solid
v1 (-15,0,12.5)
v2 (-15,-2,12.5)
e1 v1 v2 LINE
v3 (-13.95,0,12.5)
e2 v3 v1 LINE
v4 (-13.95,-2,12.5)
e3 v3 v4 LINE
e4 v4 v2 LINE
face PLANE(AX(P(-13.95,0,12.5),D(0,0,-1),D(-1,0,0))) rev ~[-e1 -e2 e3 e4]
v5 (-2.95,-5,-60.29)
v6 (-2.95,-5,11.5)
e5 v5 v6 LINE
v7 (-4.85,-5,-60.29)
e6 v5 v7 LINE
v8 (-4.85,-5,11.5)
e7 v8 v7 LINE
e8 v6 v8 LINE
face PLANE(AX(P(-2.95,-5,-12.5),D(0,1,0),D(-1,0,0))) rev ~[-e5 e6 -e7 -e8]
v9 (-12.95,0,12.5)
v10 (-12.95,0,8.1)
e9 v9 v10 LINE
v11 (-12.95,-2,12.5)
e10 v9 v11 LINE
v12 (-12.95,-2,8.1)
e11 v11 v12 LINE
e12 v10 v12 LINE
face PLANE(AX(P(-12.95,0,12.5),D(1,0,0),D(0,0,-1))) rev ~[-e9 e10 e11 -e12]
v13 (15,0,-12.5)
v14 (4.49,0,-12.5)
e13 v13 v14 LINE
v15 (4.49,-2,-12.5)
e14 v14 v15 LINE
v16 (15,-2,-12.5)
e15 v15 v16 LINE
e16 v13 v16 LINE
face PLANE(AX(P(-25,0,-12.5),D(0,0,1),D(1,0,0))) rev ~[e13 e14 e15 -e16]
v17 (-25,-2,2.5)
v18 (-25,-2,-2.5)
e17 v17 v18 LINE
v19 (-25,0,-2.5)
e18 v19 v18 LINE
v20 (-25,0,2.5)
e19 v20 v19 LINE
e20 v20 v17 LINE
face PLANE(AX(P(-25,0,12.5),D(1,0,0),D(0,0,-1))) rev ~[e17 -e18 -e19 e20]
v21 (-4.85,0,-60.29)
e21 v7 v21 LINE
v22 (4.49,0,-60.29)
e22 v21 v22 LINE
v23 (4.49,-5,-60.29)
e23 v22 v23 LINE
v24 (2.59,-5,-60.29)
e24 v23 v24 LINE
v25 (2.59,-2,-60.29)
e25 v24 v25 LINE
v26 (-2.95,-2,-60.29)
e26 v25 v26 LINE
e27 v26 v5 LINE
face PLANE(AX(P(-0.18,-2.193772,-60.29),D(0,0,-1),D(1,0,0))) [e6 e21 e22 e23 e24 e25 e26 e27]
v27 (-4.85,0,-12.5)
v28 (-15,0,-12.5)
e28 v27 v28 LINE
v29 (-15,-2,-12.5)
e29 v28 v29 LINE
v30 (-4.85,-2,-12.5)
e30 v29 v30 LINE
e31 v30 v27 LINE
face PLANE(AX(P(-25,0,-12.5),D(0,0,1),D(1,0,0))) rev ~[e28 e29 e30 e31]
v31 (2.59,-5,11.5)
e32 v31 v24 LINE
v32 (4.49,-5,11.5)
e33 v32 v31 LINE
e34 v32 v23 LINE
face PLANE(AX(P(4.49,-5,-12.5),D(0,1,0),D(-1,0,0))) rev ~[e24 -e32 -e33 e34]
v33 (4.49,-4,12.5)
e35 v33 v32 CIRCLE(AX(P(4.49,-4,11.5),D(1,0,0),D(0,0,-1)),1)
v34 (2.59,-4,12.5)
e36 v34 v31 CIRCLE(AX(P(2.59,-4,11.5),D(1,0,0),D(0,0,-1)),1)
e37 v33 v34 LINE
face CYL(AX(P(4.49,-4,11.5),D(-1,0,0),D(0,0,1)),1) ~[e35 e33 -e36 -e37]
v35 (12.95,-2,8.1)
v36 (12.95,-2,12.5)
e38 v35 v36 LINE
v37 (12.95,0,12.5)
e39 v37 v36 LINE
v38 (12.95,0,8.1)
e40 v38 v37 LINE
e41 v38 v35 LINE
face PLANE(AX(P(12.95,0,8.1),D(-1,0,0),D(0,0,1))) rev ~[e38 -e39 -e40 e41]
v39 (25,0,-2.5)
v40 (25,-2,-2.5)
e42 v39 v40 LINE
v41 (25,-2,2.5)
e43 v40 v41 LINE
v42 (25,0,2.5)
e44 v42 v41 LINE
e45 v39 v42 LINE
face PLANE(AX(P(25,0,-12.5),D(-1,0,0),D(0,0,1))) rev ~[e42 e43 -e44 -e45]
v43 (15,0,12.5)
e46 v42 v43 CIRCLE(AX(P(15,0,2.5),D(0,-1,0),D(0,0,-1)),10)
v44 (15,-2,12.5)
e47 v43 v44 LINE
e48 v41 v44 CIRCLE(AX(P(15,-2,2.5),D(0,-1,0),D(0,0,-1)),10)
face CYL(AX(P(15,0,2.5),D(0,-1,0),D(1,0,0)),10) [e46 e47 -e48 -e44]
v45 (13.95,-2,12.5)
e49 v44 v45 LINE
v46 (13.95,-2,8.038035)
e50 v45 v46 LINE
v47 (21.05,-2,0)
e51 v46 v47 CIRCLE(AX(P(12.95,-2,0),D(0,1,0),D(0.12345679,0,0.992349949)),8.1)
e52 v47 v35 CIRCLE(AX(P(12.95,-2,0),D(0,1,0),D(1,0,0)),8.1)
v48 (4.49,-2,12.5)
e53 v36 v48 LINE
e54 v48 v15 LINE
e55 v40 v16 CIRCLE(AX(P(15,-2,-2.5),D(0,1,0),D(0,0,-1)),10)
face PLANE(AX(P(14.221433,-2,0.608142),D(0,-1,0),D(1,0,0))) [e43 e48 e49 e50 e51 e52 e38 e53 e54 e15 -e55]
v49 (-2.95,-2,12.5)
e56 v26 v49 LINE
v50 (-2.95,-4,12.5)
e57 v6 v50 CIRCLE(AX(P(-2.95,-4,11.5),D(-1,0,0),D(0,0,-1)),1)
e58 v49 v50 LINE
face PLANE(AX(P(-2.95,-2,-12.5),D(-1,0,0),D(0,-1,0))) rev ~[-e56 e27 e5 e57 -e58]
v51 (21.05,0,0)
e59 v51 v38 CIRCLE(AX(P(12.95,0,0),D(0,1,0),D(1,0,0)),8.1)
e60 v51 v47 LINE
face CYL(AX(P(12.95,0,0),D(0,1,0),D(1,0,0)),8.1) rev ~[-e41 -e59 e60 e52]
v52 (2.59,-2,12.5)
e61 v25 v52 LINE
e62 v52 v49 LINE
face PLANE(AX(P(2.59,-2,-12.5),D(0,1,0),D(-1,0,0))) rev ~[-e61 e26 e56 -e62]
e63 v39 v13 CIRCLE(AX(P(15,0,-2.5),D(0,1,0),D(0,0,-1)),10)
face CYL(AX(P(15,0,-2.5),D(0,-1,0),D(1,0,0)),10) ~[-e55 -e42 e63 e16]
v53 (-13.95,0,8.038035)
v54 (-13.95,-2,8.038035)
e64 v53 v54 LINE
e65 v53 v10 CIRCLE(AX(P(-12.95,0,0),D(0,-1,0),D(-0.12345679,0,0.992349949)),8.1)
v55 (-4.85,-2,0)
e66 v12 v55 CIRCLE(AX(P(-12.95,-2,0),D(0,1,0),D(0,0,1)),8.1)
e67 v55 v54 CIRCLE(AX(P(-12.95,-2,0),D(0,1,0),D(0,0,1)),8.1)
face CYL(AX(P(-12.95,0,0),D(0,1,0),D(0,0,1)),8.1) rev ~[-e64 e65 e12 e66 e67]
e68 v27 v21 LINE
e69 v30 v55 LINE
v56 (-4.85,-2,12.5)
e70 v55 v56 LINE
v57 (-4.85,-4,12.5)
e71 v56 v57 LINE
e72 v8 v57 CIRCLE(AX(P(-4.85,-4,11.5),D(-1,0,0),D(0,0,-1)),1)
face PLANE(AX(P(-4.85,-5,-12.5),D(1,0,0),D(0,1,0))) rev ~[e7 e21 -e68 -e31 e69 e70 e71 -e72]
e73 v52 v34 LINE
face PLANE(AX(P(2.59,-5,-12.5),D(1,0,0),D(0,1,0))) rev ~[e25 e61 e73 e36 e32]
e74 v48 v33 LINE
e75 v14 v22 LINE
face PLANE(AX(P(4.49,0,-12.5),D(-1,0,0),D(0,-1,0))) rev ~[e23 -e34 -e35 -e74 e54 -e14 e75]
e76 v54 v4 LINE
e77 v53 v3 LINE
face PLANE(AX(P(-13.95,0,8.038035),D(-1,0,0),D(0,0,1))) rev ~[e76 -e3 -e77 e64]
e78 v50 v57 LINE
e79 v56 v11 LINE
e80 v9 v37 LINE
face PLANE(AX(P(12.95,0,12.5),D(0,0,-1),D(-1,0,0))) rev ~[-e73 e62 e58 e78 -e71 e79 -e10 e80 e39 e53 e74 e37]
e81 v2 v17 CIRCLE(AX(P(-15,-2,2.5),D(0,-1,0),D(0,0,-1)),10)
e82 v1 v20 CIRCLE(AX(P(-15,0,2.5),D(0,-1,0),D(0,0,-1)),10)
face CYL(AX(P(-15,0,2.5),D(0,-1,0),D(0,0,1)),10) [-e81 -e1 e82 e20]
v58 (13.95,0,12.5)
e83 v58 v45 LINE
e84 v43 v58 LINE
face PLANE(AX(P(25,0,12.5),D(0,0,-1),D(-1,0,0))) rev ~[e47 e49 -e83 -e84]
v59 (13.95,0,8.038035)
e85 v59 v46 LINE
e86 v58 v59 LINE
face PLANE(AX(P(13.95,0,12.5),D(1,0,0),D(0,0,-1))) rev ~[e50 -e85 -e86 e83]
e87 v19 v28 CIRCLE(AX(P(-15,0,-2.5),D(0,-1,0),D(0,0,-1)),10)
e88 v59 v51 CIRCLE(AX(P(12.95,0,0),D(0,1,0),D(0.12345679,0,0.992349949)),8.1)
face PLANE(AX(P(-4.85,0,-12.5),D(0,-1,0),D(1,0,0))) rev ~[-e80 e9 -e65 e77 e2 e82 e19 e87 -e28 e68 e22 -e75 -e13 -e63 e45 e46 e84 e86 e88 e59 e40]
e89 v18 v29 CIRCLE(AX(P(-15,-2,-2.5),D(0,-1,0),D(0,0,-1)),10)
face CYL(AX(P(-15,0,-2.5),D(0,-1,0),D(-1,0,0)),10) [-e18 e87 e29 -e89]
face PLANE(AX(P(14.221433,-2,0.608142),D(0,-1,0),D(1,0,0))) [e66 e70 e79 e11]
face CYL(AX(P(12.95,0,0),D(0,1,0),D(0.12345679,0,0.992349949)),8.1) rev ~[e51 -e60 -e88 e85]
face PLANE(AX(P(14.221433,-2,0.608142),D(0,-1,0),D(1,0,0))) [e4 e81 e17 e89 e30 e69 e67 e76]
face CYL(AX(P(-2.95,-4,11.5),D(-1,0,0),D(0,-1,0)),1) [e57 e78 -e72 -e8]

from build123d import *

# Parameters (mm, degrees)
F0_W     = 5.54
F0_H     = 25
F1_DEPTH = 2
F2_R     = 10
F3_DEPTH = 5
F5_DEPTH = 47.79
F6_R     = 1


# Not quite as in the source:
# - a feature of the source that left no trace in its solid (it failed there, or was rolled back) is left out


with BuildPart() as f1:
    # F0 (on Front) → F1 (new body)
    with BuildSketch(Plane.XZ):
        with BuildLine():
            Line((4.49, -12.5), (25, -12.5))
            Line((25, -12.5), (25, 12.5))
            Line((25, 12.5), (13.95, 12.5))
            Line((13.95, 12.5), (13.95, 8.0380345856))
            ThreePointArc((13.95, 8.0380345856), (19.0208319035, 5.3623688795), (21.05, 0))
            ThreePointArc((21.05, 0), (7.2224350724, -5.7275649276), (12.95, 8.1))
            Line((12.95, 8.1), (12.95, 12.5))
            Line((12.95, 12.5), (4.49, 12.5))
            Line((4.49, 12.5), (4.49, 0))
            Line((4.49, 0), (4.49, -12.5))
        make_face()
        with BuildLine():
            ThreePointArc((-12.95, 8.1), (-7.2224350724, 5.7275649276), (-4.85, 0))
            Line((-4.85, 0), (-4.85, 12.5))
            Line((-4.85, 12.5), (-12.95, 12.5))
            Line((-12.95, 12.5), (-12.95, 8.1))
        make_face()
        with BuildLine():
            Line((-25, -12.5), (-4.85, -12.5))
            Line((-4.85, -12.5), (-4.85, 0))
            ThreePointArc((-4.85, 0), (-18.3123688795, -6.0708319035), (-13.95, 8.0380345856))
            Line((-13.95, 8.0380345856), (-13.95, 12.5))
            Line((-13.95, 12.5), (-25, 12.5))
            Line((-25, 12.5), (-25, -12.5))
        make_face()
        Polygon((-4.85, -12.5), (-2.95, -12.5), (-2.95, 12.5), (-4.85, 12.5), (-4.85, 0), align=None)
        with Locations((-0.18, 0)):
            Rectangle(F0_W, F0_H)
        Polygon((2.59, -12.5), (4.49, -12.5), (4.49, 0), (4.49, 12.5), (2.59, 12.5), align=None)
    extrude(amount=F1_DEPTH)

    # F2
    f2_edges = [f1.edges().sort_by_distance(p)[0] for p in [
        (25, -1, -12.5),
        (25, -1, 12.5),
        (-25, -1, 12.5),
        (-25, -1, -12.5),
    ]]
    fillet(f2_edges, radius=F2_R)

    # F0 (on Front) → F3 (join)
    with BuildSketch(Plane.XZ):
        Polygon((2.59, -12.5), (4.49, -12.5), (4.49, 0), (4.49, 12.5), (2.59, 12.5), align=None)
        Polygon((-4.85, -12.5), (-2.95, -12.5), (-2.95, 12.5), (-4.85, 12.5), (-4.85, 0), align=None)
    extrude(amount=F3_DEPTH)

    # F4 (on face) → F5 (join)
    with BuildSketch(Plane(origin=(0, 0, -12.5), x_dir=(1, 0, 0), z_dir=(0, 0, -1))):
        Polygon((-2.95, 5), (-4.85, 5), (-4.85, 0), (4.49, 0), (4.49, 2), (4.49, 5), (2.59, 5), (2.59, 2), (-2.95, 2), align=None)
    extrude(amount=F5_DEPTH)

    # F6
    f6_edges = [f1.edges().sort_by_distance(p)[0] for p in [
        (-3.9, -5, 12.5),
        (3.54, -5, 12.5),
    ]]
    fillet(f6_edges, radius=F6_R)


solid = f1.part
